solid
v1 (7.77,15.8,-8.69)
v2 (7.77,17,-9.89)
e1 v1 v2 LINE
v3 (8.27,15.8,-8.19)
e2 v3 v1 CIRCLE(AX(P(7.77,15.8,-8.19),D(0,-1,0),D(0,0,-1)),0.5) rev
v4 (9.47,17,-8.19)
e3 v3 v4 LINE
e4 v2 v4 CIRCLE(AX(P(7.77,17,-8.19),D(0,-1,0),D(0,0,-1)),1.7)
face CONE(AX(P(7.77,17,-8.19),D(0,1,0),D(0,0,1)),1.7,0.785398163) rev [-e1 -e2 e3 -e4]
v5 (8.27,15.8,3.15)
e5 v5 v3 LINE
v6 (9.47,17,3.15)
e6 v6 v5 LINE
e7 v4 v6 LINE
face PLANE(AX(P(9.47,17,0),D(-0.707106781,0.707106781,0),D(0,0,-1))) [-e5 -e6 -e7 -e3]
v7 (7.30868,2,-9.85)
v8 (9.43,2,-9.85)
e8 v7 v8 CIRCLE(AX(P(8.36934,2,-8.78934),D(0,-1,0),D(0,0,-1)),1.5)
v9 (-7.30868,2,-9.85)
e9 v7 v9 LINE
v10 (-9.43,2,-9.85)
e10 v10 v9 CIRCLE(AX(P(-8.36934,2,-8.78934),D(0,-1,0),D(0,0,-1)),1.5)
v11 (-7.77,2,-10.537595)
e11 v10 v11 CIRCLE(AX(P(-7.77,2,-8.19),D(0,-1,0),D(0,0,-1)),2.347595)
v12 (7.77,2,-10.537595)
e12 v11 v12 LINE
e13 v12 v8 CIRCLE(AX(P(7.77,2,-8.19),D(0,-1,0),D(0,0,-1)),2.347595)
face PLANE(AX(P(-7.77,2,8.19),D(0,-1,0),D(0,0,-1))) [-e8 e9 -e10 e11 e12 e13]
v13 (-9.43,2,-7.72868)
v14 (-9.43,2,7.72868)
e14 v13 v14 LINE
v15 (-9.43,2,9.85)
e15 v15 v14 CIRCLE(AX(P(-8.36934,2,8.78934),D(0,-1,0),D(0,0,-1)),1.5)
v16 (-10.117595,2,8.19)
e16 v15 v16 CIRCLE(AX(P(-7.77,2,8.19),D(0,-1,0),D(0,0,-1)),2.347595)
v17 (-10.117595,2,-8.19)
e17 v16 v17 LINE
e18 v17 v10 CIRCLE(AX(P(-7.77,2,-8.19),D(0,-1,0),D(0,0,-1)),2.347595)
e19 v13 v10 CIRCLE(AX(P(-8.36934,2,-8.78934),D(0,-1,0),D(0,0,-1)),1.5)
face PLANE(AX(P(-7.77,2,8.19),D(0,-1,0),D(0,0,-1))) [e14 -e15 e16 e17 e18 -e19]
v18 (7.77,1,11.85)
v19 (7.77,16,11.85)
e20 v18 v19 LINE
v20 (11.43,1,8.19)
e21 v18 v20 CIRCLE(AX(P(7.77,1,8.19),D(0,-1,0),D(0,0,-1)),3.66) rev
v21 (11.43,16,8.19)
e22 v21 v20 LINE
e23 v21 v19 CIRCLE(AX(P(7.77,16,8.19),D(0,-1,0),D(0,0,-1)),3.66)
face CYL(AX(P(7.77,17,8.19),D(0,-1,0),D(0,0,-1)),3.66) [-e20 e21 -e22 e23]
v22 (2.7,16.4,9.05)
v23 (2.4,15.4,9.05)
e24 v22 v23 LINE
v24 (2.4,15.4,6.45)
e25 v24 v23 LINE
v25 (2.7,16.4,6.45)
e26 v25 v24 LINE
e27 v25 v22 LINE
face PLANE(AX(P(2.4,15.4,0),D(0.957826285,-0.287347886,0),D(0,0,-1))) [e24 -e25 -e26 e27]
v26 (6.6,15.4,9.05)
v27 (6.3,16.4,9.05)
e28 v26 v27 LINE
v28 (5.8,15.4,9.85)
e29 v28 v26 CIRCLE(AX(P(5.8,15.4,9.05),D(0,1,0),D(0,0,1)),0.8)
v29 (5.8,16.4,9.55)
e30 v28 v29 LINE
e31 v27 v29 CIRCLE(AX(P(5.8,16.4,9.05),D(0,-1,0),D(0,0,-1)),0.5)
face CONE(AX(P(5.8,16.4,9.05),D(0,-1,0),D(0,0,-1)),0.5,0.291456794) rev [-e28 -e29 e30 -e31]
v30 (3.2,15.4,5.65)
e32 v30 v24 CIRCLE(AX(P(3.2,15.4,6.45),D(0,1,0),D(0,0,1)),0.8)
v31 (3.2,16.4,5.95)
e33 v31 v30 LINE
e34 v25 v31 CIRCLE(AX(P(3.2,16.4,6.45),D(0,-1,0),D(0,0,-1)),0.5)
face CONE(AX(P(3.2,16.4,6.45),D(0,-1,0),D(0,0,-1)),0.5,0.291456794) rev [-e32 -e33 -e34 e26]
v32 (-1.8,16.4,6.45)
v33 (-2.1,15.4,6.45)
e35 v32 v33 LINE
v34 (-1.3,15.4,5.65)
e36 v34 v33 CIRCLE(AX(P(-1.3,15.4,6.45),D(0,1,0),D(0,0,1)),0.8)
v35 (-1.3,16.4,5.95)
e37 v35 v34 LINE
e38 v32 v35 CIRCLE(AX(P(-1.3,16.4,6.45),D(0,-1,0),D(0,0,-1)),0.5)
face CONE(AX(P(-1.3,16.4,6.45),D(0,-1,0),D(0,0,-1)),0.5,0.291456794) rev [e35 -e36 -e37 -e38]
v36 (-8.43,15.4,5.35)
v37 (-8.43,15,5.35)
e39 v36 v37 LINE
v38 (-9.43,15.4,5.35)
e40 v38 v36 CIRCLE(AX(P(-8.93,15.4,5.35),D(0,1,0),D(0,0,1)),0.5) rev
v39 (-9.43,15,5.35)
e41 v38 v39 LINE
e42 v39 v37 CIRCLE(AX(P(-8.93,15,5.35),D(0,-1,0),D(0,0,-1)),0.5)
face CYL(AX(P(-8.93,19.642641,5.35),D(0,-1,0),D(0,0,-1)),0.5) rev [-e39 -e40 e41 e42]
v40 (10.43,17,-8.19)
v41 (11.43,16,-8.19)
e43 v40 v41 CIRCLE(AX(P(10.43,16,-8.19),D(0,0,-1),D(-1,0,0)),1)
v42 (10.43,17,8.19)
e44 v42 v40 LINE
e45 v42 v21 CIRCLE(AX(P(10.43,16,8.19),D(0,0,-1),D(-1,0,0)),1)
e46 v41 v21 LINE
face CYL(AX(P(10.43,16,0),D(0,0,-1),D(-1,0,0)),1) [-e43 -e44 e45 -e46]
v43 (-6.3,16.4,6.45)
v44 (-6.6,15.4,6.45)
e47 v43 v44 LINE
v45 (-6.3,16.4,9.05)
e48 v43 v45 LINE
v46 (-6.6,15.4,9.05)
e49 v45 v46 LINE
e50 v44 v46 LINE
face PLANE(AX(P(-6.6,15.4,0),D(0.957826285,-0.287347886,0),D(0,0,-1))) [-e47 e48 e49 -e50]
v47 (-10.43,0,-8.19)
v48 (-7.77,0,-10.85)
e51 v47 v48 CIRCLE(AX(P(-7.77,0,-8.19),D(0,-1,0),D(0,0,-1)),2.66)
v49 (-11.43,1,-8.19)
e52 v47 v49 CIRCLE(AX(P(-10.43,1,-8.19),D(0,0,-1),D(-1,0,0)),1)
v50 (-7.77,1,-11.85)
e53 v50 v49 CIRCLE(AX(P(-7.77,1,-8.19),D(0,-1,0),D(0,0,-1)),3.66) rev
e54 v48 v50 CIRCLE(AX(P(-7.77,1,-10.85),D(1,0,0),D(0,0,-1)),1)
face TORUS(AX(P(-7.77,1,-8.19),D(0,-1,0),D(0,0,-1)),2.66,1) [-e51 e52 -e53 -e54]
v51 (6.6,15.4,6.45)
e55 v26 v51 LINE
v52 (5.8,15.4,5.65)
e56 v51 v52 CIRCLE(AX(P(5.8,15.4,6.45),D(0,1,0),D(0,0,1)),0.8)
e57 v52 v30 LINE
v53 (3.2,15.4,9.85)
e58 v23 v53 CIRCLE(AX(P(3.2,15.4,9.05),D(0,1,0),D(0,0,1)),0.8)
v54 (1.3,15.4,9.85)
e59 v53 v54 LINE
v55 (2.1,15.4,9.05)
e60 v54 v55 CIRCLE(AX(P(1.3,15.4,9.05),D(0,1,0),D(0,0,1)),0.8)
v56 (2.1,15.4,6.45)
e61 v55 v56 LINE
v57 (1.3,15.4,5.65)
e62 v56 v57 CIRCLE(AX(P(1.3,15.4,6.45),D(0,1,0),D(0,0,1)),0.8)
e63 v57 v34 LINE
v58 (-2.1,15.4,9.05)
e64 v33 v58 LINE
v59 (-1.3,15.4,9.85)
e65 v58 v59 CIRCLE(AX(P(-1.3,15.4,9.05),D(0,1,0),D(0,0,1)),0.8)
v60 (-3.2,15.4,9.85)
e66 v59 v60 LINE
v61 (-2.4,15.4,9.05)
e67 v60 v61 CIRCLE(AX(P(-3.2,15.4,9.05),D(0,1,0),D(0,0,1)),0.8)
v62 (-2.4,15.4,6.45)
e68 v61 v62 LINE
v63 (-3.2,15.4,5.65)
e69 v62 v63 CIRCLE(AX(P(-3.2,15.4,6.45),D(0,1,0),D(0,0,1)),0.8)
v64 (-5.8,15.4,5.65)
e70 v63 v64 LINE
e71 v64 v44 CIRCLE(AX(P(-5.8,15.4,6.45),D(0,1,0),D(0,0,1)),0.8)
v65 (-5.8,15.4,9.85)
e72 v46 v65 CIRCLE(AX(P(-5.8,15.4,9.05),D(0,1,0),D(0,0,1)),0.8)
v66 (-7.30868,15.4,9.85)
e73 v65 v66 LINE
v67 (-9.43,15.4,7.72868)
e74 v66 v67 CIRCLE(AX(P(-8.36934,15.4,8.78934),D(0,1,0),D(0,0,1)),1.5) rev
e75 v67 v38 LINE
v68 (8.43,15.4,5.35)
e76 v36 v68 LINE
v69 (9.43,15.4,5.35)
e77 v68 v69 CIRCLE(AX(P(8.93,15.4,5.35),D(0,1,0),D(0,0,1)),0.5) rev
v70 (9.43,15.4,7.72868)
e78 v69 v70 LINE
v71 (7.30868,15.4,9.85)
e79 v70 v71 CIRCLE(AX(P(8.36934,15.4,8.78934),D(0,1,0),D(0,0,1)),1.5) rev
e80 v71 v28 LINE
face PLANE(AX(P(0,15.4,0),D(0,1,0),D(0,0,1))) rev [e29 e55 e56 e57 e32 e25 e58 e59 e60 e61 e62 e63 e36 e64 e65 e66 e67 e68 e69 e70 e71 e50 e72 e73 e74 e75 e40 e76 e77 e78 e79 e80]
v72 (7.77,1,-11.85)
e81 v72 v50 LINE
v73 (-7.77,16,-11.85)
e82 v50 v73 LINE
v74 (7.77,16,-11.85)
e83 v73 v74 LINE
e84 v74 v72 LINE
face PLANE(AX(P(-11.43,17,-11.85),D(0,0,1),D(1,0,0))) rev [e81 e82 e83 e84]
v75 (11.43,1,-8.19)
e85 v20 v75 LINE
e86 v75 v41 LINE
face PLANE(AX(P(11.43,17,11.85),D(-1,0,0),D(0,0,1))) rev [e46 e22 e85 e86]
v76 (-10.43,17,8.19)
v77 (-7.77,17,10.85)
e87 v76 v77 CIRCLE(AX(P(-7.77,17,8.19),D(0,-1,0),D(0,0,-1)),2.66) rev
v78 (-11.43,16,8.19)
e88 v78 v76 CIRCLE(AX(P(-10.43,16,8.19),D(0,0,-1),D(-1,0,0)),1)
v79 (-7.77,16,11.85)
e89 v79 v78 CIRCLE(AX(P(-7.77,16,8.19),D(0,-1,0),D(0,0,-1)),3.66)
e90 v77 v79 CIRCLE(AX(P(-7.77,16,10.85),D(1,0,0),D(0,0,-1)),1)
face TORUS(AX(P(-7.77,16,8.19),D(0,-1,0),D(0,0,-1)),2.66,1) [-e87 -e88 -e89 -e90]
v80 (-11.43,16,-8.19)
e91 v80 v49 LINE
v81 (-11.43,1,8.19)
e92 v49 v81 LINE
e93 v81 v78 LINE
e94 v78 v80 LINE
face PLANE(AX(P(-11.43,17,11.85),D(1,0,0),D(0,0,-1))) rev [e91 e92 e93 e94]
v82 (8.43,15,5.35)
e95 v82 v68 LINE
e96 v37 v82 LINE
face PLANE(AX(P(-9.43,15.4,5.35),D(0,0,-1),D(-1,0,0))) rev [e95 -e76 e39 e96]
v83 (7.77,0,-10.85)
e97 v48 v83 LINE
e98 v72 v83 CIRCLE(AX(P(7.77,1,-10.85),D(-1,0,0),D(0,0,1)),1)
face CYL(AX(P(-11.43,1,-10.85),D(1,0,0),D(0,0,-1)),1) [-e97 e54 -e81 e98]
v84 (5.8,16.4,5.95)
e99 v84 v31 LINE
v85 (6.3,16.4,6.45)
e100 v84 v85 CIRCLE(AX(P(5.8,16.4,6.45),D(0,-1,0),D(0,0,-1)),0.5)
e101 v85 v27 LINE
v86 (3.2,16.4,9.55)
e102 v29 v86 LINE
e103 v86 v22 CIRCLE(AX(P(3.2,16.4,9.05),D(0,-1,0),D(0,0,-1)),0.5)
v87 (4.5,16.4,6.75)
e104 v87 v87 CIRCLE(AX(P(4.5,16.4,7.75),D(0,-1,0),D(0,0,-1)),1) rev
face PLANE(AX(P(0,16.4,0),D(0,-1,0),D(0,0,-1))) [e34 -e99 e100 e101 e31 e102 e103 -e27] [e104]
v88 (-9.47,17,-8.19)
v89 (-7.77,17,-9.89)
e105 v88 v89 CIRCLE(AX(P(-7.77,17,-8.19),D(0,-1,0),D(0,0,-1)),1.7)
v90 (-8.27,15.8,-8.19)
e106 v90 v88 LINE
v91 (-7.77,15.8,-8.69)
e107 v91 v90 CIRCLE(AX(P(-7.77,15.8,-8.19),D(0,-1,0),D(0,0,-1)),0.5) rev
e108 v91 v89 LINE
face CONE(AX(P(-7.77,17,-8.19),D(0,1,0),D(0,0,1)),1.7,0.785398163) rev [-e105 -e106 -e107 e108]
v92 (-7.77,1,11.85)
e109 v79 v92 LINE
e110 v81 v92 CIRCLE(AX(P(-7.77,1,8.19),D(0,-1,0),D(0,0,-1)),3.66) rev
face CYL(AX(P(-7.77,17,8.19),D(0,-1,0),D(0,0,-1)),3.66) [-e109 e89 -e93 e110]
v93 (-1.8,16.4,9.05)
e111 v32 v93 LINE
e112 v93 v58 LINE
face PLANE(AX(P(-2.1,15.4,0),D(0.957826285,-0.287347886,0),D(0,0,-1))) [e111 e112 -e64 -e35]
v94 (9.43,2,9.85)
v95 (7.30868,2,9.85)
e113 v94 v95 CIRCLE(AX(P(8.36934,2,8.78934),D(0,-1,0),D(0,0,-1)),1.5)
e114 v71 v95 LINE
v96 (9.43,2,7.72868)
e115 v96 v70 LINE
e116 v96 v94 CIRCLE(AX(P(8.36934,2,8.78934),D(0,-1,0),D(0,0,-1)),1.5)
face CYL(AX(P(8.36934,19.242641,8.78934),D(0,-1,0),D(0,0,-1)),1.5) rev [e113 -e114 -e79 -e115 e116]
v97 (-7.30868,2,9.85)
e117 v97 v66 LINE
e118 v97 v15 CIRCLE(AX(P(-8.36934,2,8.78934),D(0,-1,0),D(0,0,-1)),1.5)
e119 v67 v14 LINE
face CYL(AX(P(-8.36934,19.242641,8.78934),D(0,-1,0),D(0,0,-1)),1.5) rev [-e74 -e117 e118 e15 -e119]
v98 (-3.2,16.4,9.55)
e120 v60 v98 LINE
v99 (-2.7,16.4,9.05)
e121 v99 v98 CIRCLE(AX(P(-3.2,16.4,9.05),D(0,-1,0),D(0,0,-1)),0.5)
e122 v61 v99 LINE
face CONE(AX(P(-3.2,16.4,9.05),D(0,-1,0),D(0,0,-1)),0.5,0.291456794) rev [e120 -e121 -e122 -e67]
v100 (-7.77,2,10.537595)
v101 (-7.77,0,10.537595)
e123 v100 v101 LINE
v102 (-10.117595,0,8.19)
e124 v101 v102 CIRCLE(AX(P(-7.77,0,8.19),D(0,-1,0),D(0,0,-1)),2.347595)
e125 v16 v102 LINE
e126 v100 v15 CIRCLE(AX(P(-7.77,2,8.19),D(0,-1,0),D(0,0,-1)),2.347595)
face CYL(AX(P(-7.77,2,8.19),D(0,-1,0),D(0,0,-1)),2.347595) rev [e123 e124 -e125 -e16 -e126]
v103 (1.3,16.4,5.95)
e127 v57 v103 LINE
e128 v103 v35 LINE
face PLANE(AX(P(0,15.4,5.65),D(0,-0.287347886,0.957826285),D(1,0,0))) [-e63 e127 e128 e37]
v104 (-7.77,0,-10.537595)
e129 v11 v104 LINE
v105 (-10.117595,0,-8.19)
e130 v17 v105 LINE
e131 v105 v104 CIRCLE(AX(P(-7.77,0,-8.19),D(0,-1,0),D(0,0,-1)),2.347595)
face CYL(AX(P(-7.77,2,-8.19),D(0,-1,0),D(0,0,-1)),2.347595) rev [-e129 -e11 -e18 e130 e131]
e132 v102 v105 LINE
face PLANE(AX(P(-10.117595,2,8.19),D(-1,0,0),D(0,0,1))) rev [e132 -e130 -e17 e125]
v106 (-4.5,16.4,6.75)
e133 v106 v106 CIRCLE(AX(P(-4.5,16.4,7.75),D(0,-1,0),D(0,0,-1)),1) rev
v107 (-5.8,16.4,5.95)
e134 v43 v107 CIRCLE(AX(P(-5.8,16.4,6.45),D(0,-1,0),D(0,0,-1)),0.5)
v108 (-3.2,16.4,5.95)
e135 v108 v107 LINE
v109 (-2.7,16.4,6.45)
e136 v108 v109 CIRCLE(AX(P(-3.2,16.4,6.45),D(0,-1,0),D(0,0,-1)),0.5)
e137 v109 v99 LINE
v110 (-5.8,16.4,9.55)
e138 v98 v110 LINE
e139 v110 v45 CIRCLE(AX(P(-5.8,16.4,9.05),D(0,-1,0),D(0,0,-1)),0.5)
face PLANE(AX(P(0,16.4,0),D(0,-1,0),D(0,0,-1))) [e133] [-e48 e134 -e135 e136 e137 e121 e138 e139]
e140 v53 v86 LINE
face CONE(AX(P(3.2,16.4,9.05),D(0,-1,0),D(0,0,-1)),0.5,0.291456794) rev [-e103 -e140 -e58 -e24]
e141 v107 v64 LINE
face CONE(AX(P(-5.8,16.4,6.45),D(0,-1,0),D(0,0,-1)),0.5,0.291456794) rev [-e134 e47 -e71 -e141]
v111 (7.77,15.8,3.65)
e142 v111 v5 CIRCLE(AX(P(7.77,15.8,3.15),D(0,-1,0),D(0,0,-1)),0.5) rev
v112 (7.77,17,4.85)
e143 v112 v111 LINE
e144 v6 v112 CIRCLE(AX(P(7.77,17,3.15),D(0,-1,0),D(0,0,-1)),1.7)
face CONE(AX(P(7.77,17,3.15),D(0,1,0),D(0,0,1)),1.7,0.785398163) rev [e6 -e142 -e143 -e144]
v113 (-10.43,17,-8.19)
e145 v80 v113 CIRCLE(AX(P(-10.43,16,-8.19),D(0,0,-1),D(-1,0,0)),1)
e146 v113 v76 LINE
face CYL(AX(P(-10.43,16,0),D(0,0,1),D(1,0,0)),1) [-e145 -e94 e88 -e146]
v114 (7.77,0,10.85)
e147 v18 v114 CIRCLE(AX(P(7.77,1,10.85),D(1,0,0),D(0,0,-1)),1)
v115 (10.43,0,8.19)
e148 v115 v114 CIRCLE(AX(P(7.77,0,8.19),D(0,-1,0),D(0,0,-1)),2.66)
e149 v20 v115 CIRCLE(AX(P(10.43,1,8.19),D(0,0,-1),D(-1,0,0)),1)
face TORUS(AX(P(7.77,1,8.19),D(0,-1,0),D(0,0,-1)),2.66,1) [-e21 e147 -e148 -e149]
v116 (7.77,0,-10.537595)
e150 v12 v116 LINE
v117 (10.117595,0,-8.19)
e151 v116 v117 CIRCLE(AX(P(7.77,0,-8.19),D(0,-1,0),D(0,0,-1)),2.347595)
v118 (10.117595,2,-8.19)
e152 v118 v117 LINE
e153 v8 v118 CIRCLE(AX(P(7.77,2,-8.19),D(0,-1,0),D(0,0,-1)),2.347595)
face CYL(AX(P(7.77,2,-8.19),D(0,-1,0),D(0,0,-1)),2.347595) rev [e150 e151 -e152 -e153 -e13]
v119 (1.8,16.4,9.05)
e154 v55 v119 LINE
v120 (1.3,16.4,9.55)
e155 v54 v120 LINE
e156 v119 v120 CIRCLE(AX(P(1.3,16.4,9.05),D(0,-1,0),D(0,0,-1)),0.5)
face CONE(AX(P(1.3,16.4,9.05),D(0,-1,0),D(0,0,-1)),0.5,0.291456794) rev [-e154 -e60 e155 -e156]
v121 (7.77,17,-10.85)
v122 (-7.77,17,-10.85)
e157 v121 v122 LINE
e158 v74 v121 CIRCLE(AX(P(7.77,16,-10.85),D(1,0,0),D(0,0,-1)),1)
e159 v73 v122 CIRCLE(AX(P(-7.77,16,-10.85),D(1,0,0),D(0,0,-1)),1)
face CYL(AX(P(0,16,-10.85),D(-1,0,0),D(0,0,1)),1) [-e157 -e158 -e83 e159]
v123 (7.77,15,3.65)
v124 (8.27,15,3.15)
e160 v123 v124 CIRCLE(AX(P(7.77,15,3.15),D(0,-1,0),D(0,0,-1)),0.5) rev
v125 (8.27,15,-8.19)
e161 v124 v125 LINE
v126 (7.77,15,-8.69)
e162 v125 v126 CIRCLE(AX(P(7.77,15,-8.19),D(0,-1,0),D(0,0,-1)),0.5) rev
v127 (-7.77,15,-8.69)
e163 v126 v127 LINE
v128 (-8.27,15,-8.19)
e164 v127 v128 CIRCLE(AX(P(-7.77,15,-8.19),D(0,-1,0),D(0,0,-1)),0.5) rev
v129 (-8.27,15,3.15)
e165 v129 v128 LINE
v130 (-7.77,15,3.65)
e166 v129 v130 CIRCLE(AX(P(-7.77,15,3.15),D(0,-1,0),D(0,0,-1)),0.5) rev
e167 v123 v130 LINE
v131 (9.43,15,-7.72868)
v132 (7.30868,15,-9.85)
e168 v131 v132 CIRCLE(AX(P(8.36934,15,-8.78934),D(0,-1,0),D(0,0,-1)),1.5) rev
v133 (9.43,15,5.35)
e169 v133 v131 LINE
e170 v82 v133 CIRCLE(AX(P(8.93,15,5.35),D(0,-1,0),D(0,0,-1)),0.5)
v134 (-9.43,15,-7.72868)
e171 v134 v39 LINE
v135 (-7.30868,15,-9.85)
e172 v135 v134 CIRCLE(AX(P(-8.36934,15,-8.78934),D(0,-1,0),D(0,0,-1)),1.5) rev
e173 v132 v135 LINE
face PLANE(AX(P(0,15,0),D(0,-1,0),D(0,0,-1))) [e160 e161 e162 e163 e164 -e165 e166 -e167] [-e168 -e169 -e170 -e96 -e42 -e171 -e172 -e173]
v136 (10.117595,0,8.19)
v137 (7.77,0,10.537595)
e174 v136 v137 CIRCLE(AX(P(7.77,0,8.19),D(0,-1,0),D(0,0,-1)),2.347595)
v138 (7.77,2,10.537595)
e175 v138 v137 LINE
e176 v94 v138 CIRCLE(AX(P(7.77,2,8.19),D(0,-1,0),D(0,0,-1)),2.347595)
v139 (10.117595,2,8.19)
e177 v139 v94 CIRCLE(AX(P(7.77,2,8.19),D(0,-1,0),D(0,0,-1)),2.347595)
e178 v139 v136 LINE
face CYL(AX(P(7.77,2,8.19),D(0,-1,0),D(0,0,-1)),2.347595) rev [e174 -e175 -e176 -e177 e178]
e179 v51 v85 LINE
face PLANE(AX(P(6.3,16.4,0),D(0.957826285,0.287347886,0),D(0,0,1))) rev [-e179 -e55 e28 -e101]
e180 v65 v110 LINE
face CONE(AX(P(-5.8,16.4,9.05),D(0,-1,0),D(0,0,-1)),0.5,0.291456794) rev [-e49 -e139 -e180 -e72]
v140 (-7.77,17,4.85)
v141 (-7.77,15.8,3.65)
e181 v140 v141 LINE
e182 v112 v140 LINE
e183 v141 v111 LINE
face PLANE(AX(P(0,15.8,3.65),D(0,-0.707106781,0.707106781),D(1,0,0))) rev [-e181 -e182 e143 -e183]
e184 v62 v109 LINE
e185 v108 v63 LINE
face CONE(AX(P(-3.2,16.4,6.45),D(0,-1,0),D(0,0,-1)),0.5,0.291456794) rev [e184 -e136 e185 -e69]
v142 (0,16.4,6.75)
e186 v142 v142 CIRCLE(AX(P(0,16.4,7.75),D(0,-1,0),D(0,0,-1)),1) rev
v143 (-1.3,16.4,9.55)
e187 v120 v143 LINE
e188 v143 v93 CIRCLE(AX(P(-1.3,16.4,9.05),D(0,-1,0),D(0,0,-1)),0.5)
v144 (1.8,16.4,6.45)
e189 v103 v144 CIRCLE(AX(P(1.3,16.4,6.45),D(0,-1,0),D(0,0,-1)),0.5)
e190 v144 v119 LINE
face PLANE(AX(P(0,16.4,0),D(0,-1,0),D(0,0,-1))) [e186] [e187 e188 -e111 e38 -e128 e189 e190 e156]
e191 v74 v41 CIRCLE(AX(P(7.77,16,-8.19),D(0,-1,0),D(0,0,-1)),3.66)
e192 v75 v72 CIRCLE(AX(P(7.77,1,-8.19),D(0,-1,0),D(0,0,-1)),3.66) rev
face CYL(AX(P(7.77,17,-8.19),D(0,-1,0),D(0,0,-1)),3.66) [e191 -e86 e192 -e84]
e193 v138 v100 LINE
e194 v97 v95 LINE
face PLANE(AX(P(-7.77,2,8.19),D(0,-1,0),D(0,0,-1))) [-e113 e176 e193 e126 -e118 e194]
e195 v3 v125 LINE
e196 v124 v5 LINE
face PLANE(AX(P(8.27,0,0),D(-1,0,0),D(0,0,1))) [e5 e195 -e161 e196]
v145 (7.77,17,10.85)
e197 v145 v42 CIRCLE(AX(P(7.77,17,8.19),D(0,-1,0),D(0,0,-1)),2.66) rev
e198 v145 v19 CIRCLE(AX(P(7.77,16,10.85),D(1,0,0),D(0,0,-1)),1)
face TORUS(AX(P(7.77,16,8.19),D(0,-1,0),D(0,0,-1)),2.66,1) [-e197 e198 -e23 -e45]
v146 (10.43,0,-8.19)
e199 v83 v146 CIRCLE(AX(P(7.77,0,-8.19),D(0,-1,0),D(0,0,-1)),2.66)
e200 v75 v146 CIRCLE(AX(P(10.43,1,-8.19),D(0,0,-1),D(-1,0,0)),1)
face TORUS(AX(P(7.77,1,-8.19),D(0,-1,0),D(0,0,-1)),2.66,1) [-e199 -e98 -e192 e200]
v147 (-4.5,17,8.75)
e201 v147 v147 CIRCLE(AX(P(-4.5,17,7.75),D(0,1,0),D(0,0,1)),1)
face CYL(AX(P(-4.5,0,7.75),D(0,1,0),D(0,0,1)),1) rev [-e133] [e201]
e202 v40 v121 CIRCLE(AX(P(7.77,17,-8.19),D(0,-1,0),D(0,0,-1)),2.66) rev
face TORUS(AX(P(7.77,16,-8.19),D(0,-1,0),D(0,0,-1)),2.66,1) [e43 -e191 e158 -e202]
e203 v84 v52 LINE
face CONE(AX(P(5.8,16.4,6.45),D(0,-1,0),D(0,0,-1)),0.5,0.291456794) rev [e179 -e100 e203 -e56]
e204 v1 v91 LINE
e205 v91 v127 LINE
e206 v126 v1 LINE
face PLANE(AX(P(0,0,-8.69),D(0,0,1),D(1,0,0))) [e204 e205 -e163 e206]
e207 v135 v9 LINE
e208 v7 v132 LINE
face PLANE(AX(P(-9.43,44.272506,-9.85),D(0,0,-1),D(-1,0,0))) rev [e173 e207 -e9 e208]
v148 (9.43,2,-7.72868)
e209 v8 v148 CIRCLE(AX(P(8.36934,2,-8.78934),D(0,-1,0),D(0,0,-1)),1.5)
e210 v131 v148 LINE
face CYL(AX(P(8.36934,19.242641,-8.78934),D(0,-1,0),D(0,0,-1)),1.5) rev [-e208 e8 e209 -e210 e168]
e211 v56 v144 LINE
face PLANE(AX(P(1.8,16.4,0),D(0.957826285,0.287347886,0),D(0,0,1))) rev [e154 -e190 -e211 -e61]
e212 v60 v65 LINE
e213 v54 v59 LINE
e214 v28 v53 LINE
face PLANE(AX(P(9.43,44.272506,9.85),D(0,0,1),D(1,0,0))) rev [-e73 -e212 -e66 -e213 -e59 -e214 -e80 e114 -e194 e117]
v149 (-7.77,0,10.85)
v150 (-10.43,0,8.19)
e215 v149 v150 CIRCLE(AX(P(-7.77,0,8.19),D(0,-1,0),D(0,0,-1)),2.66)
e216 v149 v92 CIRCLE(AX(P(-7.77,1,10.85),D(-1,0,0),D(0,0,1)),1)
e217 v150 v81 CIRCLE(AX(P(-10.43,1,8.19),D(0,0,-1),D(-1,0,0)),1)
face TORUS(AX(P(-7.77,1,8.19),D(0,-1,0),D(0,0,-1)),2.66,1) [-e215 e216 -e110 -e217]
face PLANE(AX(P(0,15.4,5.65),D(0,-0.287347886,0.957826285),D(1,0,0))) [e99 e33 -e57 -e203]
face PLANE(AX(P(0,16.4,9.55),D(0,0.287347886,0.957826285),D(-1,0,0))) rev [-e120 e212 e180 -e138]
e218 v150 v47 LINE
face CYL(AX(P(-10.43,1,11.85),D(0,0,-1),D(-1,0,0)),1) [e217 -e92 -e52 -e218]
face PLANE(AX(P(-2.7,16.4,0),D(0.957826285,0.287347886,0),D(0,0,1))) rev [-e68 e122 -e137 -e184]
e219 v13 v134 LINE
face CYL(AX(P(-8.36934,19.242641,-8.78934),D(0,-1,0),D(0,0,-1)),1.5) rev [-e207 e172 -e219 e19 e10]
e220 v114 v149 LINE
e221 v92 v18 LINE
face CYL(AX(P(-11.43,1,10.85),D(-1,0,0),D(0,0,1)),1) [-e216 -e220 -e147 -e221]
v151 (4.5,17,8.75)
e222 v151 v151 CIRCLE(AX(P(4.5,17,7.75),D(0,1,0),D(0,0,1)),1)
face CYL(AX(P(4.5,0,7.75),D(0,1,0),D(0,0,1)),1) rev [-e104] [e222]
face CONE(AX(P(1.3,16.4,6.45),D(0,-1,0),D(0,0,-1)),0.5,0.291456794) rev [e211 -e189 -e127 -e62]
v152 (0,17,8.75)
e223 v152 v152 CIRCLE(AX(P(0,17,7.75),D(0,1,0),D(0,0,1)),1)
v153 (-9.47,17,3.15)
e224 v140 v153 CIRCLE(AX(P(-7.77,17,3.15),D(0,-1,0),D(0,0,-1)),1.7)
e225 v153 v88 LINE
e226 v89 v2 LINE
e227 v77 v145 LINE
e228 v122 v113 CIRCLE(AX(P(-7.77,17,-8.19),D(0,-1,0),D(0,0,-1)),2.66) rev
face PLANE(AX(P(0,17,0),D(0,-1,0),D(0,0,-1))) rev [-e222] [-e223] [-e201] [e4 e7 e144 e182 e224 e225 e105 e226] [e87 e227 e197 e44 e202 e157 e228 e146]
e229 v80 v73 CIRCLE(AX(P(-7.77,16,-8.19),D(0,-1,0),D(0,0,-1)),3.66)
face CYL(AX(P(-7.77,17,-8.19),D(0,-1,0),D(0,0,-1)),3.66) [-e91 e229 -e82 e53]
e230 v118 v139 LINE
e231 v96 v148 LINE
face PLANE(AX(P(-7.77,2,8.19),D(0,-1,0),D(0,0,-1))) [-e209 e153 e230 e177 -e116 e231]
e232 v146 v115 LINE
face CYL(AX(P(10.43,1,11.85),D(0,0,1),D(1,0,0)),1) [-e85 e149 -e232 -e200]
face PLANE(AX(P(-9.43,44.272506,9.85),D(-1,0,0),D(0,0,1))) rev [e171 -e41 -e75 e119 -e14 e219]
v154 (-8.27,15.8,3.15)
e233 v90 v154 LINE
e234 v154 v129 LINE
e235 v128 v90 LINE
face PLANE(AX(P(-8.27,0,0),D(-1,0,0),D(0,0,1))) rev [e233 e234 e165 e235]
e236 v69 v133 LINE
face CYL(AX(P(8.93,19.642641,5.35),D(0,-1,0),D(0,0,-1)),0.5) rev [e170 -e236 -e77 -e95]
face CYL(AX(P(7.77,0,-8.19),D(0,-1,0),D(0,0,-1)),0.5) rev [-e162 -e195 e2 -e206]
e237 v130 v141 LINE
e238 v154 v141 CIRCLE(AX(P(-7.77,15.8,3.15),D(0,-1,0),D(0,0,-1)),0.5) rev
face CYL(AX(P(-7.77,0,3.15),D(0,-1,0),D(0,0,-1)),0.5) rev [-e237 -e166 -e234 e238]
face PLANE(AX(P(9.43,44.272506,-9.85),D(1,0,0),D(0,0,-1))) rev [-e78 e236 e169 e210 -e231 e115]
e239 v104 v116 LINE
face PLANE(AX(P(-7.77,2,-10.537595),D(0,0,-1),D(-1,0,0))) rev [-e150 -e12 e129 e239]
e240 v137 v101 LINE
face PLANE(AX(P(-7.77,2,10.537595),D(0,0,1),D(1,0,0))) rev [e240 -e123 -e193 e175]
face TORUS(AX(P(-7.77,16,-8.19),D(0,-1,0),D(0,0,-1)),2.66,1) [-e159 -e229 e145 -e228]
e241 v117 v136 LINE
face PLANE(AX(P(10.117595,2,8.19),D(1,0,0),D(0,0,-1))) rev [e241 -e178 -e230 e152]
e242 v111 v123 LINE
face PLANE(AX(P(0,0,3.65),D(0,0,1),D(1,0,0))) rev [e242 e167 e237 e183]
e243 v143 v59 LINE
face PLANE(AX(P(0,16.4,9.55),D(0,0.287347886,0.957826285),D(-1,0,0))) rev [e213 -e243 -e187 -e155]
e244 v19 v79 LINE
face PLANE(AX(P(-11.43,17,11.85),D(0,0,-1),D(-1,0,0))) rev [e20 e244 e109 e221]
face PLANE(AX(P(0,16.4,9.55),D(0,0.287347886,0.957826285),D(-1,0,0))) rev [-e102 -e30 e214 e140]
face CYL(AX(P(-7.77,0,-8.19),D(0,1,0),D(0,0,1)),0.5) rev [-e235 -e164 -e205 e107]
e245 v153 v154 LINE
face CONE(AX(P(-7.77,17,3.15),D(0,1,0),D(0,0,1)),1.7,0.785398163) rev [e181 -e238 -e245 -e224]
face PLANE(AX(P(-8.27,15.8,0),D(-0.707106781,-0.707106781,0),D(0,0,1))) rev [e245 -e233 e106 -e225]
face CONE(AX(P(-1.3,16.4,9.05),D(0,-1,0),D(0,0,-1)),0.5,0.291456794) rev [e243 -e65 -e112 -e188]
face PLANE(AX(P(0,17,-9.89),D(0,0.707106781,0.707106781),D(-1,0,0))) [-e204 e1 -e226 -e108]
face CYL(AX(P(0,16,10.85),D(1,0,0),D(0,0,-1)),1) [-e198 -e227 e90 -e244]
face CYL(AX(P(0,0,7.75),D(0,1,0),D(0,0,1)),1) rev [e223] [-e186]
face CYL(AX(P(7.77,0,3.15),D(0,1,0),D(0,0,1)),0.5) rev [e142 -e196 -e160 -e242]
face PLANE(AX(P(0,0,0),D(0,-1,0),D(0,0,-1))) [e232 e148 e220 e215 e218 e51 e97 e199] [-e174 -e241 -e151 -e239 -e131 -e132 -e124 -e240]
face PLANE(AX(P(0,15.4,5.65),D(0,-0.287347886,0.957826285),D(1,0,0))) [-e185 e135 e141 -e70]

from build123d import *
from OCP.BRepFilletAPI import BRepFilletAPI_MakeChamfer

# Parameters (mm, degrees)
SKETCH_1_W            = 22.86
SKETCH_1_H            = 23.7
EXTRUDE_1_DEPTH       = 17
SKETCH_2_W            = 18.86
SKETCH_2_H            = 19.7
CUT_EXTRUDE_1_DEPTH   = 15
FILLET_1_R            = 3.66
SKETCH_3_R            = 1
CUT_EXTRUDE_2_DEPTH   = 24.665743174
SKETCH_4_W            = 16.54
SKETCH_4_H            = 12.34
CUT_EXTRUDE_3_DEPTH   = 24.665743174
FILLET_2_R            = 0.5
CHAMFER_1_SIZE        = 1.2
FILLET_3_R            = 1
CUT_EXTRUDE_4_DEPTH   = 2
SKETCH_6_R            = 1.5
CUT_EXTRUDE_5_R_DEPTH = 13
SKETCH_8_W            = 18.86
SKETCH_8_H            = 4.5
CUT_EXTRUDE_5_DEPTH   = 0.4
CUT_EXTRUDE_START     = -1
SKETCH_11_R           = 1
CUT_EXTRUDE_6_DEPTH   = 1
SKETCH_12_R           = 1.5
SKETCH_12_R_2         = 0.5
CUT_EXTRUDE_7_DEPTH   = 0.4
CHAMFER_2_SIZE        = 0.3
CHAMFER_2_SIZE_2      = 1


with BuildPart() as part:
    # 草图1 → 凸台-拉伸1 (new body)
    with BuildSketch(Plane(origin=(0, 0, 0), x_dir=(1, 0, 0), z_dir=(0, 1, 0))):
        Rectangle(SKETCH_1_W, SKETCH_1_H)
    extrude(amount=EXTRUDE_1_DEPTH)

    # 草图2 → 切除-拉伸1 (cut)
    with BuildSketch(Plane.XZ):
        Rectangle(SKETCH_2_W, SKETCH_2_H)
    extrude(amount=-CUT_EXTRUDE_1_DEPTH, mode=Mode.SUBTRACT)

    # 圆角1
    fillet_1_edges = [part.edges().sort_by_distance(p)[0] for p in [
        (11.43, 8.5, 11.85),
        (-11.43, 8.5, 11.85),
        (-11.43, 8.5, -11.85),
        (11.43, 8.5, -11.85),
    ]]
    fillet(fillet_1_edges, radius=FILLET_1_R)

    # 草图3 → 切除-拉伸2 (cut, through all)
    with BuildSketch(Plane(origin=(0, 17, 0), x_dir=(1, 0, 0), z_dir=(0, 1, 0))):
        with Locations(Location((0, -7.75, 0), (0, 0, 270))):
            Circle(SKETCH_3_R)
        with Locations(Location((4.5, -7.75, 0), (0, 0, 270))):
            Circle(SKETCH_3_R)
        with Locations(Location((-4.5, -7.75, 0), (0, 0, 270))):
            Circle(SKETCH_3_R)
    extrude(amount=-CUT_EXTRUDE_2_DEPTH, mode=Mode.SUBTRACT)

    # 草图4 → 切除-拉伸3 (cut, through all)
    with BuildSketch(Plane(origin=(0, 17, 0), x_dir=(1, 0, 0), z_dir=(0, 1, 0))):
        with Locations((0, 2.52)):
            Rectangle(SKETCH_4_W, SKETCH_4_H)
    extrude(amount=-CUT_EXTRUDE_3_DEPTH, mode=Mode.SUBTRACT)

    # 圆角2
    fillet_2_edges = [part.edges().sort_by_distance(p)[0] for p in [
        (-8.27, 16, -8.69),
        (8.27, 16, -8.69),
        (8.27, 16, 3.65),
        (-8.27, 16, 3.65),
    ]]
    fillet(fillet_2_edges, radius=FILLET_2_R)

    # 倒角1
    chamfer_1_edges = [part.edges().sort_by_distance(p)[0] for p in [
        (8.27, 17, -2.52),
        (0, 17, 3.65),
        (-8.27, 17, -2.52),
        (0, 17, -8.69),
        (8.123553391, 17, 3.503553391),
        (-8.123553391, 17, 3.503553391),
        (-8.123553391, 17, -8.543553391),
        (8.123553391, 17, -8.543553391),
    ]]
    chamfer(chamfer_1_edges, length=CHAMFER_1_SIZE)

    # 圆角3
    fillet_3_edges = [part.edges().sort_by_distance(p)[0] for p in [
        (0, 0, -11.85),
        (0, 17, -11.85),
        (11.43, 0, 0),
        (0, 0, 11.85),
        (-11.43, 0, 0),
        (-10.358010819, 0, 10.778010819),
        (10.358010819, 0, 10.778010819),
        (-10.358010819, 0, -10.778010819),
        (10.358010819, 0, -10.778010819),
        (11.43, 17, 0),
        (-11.43, 17, 0),
        (0, 17, 11.85),
        (-10.358010819, 17, 10.778010819),
        (10.358010819, 17, 10.778010819),
        (-10.358010819, 17, -10.778010819),
        (10.358010819, 17, -10.778010819),
    ]]
    fillet(fillet_3_edges, radius=FILLET_3_R)

    # 草图5 → 切除-拉伸4 (cut)
    with BuildSketch(Plane.XZ):
        with BuildLine():
            Line((-7.77, 10.537594514), (7.77, 10.537594514))
            ThreePointArc((7.77, 10.537594514), (9.43, 9.85), (10.117594514, 8.19))
            Line((10.117594514, 8.19), (10.117594514, -8.19))
            ThreePointArc((10.117594514, -8.19), (9.43, -9.85), (7.77, -10.537594514))
            Line((7.77, -10.537594514), (-7.77, -10.537594514))
            ThreePointArc((-7.77, -10.537594514), (-9.43, -9.85), (-10.117594514, -8.19))
            Line((-10.117594514, -8.19), (-10.117594514, 8.19))
            ThreePointArc((-10.117594514, 8.19), (-9.43, 9.85), (-7.77, 10.537594514))
        make_face()
    extrude(amount=-CUT_EXTRUDE_4_DEPTH, mode=Mode.SUBTRACT)

    # 草图6 → 切除-拉伸5_可根据铣刀经济半径修改R角 (cut)
    with BuildSketch(Plane.XZ.offset(-2)):
        with Locations((8.369339828, 8.789339828)):
            Circle(SKETCH_6_R)
        with Locations((8.369339828, -8.789339828)):
            Circle(SKETCH_6_R)
        with Locations((-8.369339828, -8.789339828)):
            Circle(SKETCH_6_R)
        with Locations((-8.369339828, 8.789339828)):
            Circle(SKETCH_6_R)
    extrude(amount=-CUT_EXTRUDE_5_R_DEPTH, mode=Mode.SUBTRACT)

    # 草图8 → 切除-拉伸5 (cut)
    with BuildSketch(Plane.XZ.offset(-15)):
        with Locations((0, 7.6)):
            Rectangle(SKETCH_8_W, SKETCH_8_H)
    extrude(amount=-CUT_EXTRUDE_5_DEPTH, mode=Mode.SUBTRACT)

    # 草图11 → 切除-拉伸6 (cut)
    # profile 1 of 6: a face of its own
    with BuildSketch(Plane.XZ.offset(-15.4).offset(CUT_EXTRUDE_START)):
        with BuildLine():
            Line((2.7, 6.45), (2.7, 9.05))
            ThreePointArc((2.7, 9.05), (2.846446609, 9.403553391), (3.2, 9.55))
            Line((3.2, 9.55), (5.8, 9.55))
            ThreePointArc((5.8, 9.55), (6.153553391, 9.403553391), (6.3, 9.05))
            Line((6.3, 9.05), (6.3, 6.45))
            ThreePointArc((6.3, 6.45), (6.153553391, 6.096446609), (5.8, 5.95))
            Line((5.8, 5.95), (3.2, 5.95))
            ThreePointArc((3.2, 5.95), (2.846446609, 6.096446609), (2.7, 6.45))
        make_face()
        with BuildLine():
            ThreePointArc((3.2, 9.45), (2.917157288, 9.332842712), (2.8, 9.05))
            Line((2.8, 9.05), (2.8, 6.45))
            ThreePointArc((2.8, 6.45), (2.917157288, 6.167157288), (3.2, 6.05))
            Line((3.2, 6.05), (5.8, 6.05))
            ThreePointArc((5.8, 6.05), (6.082842712, 6.167157288), (6.2, 6.45))
            Line((6.2, 6.45), (6.2, 9.05))
            ThreePointArc((6.2, 9.05), (6.082842712, 9.332842712), (5.8, 9.45))
            Line((5.8, 9.45), (3.2, 9.45))
        make_face(mode=Mode.SUBTRACT)
    # profile 2 of 6: a face of its own
    with BuildSketch(Plane.XZ.offset(-15.4).offset(CUT_EXTRUDE_START)):
        with BuildLine():
            Line((5.8, 9.45), (3.2, 9.45))
            ThreePointArc((3.2, 9.45), (2.917157288, 9.332842712), (2.8, 9.05))
            Line((2.8, 9.05), (2.8, 6.45))
            ThreePointArc((2.8, 6.45), (2.917157288, 6.167157288), (3.2, 6.05))
            Line((3.2, 6.05), (5.8, 6.05))
            ThreePointArc((5.8, 6.05), (6.082842712, 6.167157288), (6.2, 6.45))
            Line((6.2, 6.45), (6.2, 9.05))
            ThreePointArc((6.2, 9.05), (6.082842712, 9.332842712), (5.8, 9.45))
        make_face()
        with Locations(Location((4.5, 7.75, 0), (0, 0, 90))):
            Circle(SKETCH_11_R, mode=Mode.SUBTRACT)
    # profile 3 of 6: a face of its own
    with BuildSketch(Plane.XZ.offset(-15.4).offset(CUT_EXTRUDE_START)):
        with BuildLine():
            Line((-1.8, 6.45), (-1.8, 9.05))
            ThreePointArc((-1.8, 9.05), (-1.653553391, 9.403553391), (-1.3, 9.55))
            Line((-1.3, 9.55), (1.3, 9.55))
            ThreePointArc((1.3, 9.55), (1.653553391, 9.403553391), (1.8, 9.05))
            Line((1.8, 9.05), (1.8, 6.45))
            ThreePointArc((1.8, 6.45), (1.653553391, 6.096446609), (1.3, 5.95))
            Line((1.3, 5.95), (-1.3, 5.95))
            ThreePointArc((-1.3, 5.95), (-1.653553391, 6.096446609), (-1.8, 6.45))
        make_face()
        with BuildLine():
            ThreePointArc((-1.3, 9.45), (-1.582842712, 9.332842712), (-1.7, 9.05))
            Line((-1.7, 9.05), (-1.7, 6.45))
            ThreePointArc((-1.7, 6.45), (-1.582842712, 6.167157288), (-1.3, 6.05))
            Line((-1.3, 6.05), (1.3, 6.05))
            ThreePointArc((1.3, 6.05), (1.582842712, 6.167157288), (1.7, 6.45))
            Line((1.7, 6.45), (1.7, 9.05))
            ThreePointArc((1.7, 9.05), (1.582842712, 9.332842712), (1.3, 9.45))
            Line((1.3, 9.45), (-1.3, 9.45))
        make_face(mode=Mode.SUBTRACT)
    # profile 4 of 6: a face of its own
    with BuildSketch(Plane.XZ.offset(-15.4).offset(CUT_EXTRUDE_START)):
        with BuildLine():
            Line((1.3, 9.45), (-1.3, 9.45))
            ThreePointArc((-1.3, 9.45), (-1.582842712, 9.332842712), (-1.7, 9.05))
            Line((-1.7, 9.05), (-1.7, 6.45))
            ThreePointArc((-1.7, 6.45), (-1.582842712, 6.167157288), (-1.3, 6.05))
            Line((-1.3, 6.05), (1.3, 6.05))
            ThreePointArc((1.3, 6.05), (1.582842712, 6.167157288), (1.7, 6.45))
            Line((1.7, 6.45), (1.7, 9.05))
            ThreePointArc((1.7, 9.05), (1.582842712, 9.332842712), (1.3, 9.45))
        make_face()
        with Locations(Location((0, 7.75, 0), (0, 0, 90))):
            Circle(SKETCH_11_R, mode=Mode.SUBTRACT)
    # profile 5 of 6: a face of its own
    with BuildSketch(Plane.XZ.offset(-15.4).offset(CUT_EXTRUDE_START)):
        with BuildLine():
            Line((-2.7, 6.45), (-2.7, 9.05))
            ThreePointArc((-2.7, 9.05), (-2.846446609, 9.403553391), (-3.2, 9.55))
            Line((-3.2, 9.55), (-5.8, 9.55))
            ThreePointArc((-5.8, 9.55), (-6.153553391, 9.403553391), (-6.3, 9.05))
            Line((-6.3, 9.05), (-6.3, 6.45))
            ThreePointArc((-6.3, 6.45), (-6.153553391, 6.096446609), (-5.8, 5.95))
            Line((-5.8, 5.95), (-3.2, 5.95))
            ThreePointArc((-3.2, 5.95), (-2.846446609, 6.096446609), (-2.7, 6.45))
        make_face()
        with BuildLine():
            ThreePointArc((-2.8, 9.05), (-2.917157288, 9.332842712), (-3.2, 9.45))
            Line((-3.2, 9.45), (-5.8, 9.45))
            ThreePointArc((-5.8, 9.45), (-6.082842712, 9.332842712), (-6.2, 9.05))
            Line((-6.2, 9.05), (-6.2, 6.45))
            ThreePointArc((-6.2, 6.45), (-6.082842712, 6.167157288), (-5.8, 6.05))
            Line((-5.8, 6.05), (-3.2, 6.05))
            ThreePointArc((-3.2, 6.05), (-2.917157288, 6.167157288), (-2.8, 6.45))
            Line((-2.8, 6.45), (-2.8, 9.05))
        make_face(mode=Mode.SUBTRACT)
    # profile 6 of 6: a face of its own
    with BuildSketch(Plane.XZ.offset(-15.4).offset(CUT_EXTRUDE_START)):
        with BuildLine():
            Line((-2.8, 6.45), (-2.8, 9.05))
            ThreePointArc((-2.8, 9.05), (-2.917157288, 9.332842712), (-3.2, 9.45))
            Line((-3.2, 9.45), (-5.8, 9.45))
            ThreePointArc((-5.8, 9.45), (-6.082842712, 9.332842712), (-6.2, 9.05))
            Line((-6.2, 9.05), (-6.2, 6.45))
            ThreePointArc((-6.2, 6.45), (-6.082842712, 6.167157288), (-5.8, 6.05))
            Line((-5.8, 6.05), (-3.2, 6.05))
            ThreePointArc((-3.2, 6.05), (-2.917157288, 6.167157288), (-2.8, 6.45))
        make_face()
        with Locations(Location((-4.5, 7.75, 0), (0, 0, 90))):
            Circle(SKETCH_11_R, mode=Mode.SUBTRACT)
    extrude(amount=CUT_EXTRUDE_6_DEPTH, mode=Mode.SUBTRACT)

    # 草图12 → 切除-拉伸7 (cut)
    with BuildSketch(Plane.XZ.offset(-15)):
        with Locations((8.369339828, 8.789339828)):
            Circle(SKETCH_12_R)
        with Locations((-8.369339828, 8.789339828)):
            Circle(SKETCH_12_R)
        with Locations((8.93, 5.35)):
            Circle(SKETCH_12_R_2)
        with Locations((-8.93, 5.35)):
            Circle(SKETCH_12_R_2)
    extrude(amount=-CUT_EXTRUDE_7_DEPTH, mode=Mode.SUBTRACT)

    # 倒角2
    chamfer_2_edges_1 = [part.edges().sort_by_distance(p)[0] for p in [
        (6.153553391, 15.4, 9.403553391),
    ]]
    chamfer_2_side_1 = [part.faces().sort_by_distance(p)[0] for p in [
        (6.157796031, 15.4, 9.407796031),
    ]]
    chamfer_2_edges_2 = [part.edges().sort_by_distance(p)[0] for p in [
        (4.5, 15.4, 9.55),
    ]]
    chamfer_2_side_2 = [part.faces().sort_by_distance(p)[0] for p in [
        (4.5, 15.4, 9.556),
    ]]
    chamfer_2_edges_3 = [part.edges().sort_by_distance(p)[0] for p in [
        (6.3, 15.4, 7.75),
    ]]
    chamfer_2_side_3 = [part.faces().sort_by_distance(p)[0] for p in [
        (6.306, 15.4, 7.75),
    ]]
    chamfer_2_edges_4 = [part.edges().sort_by_distance(p)[0] for p in [
        (2.846446609, 15.4, 9.403553391),
    ]]
    chamfer_2_side_4 = [part.faces().sort_by_distance(p)[0] for p in [
        (2.842203969, 15.4, 9.407796031),
    ]]
    chamfer_2_edges_5 = [part.edges().sort_by_distance(p)[0] for p in [
        (6.153553391, 15.4, 6.096446609),
    ]]
    chamfer_2_side_5 = [part.faces().sort_by_distance(p)[0] for p in [
        (6.157796031, 15.4, 6.092203969),
    ]]
    chamfer_2_edges_6 = [part.edges().sort_by_distance(p)[0] for p in [
        (2.7, 15.4, 7.75),
    ]]
    chamfer_2_side_6 = [part.faces().sort_by_distance(p)[0] for p in [
        (2.694, 15.4, 7.75),
    ]]
    chamfer_2_edges_7 = [part.edges().sort_by_distance(p)[0] for p in [
        (4.5, 15.4, 5.95),
    ]]
    chamfer_2_side_7 = [part.faces().sort_by_distance(p)[0] for p in [
        (4.5, 15.4, 5.944),
    ]]
    chamfer_2_edges_8 = [part.edges().sort_by_distance(p)[0] for p in [
        (2.846446609, 15.4, 6.096446609),
    ]]
    chamfer_2_side_8 = [part.faces().sort_by_distance(p)[0] for p in [
        (2.846446609, 15.406, 6.096446609),
    ]]
    chamfer_2_edges_9 = [part.edges().sort_by_distance(p)[0] for p in [
        (1.653553391, 15.4, 9.403553391),
    ]]
    chamfer_2_side_9 = [part.faces().sort_by_distance(p)[0] for p in [
        (1.657796031, 15.4, 9.407796031),
    ]]
    chamfer_2_edges_10 = [part.edges().sort_by_distance(p)[0] for p in [
        (0, 15.4, 9.55),
    ]]
    chamfer_2_side_10 = [part.faces().sort_by_distance(p)[0] for p in [
        (0, 15.4, 9.556),
    ]]
    chamfer_2_edges_11 = [part.edges().sort_by_distance(p)[0] for p in [
        (1.8, 15.4, 7.75),
    ]]
    chamfer_2_side_11 = [part.faces().sort_by_distance(p)[0] for p in [
        (1.806, 15.4, 7.75),
    ]]
    chamfer_2_edges_12 = [part.edges().sort_by_distance(p)[0] for p in [
        (-1.653553391, 15.4, 9.403553391),
    ]]
    chamfer_2_side_12 = [part.faces().sort_by_distance(p)[0] for p in [
        (-1.657796031, 15.4, 9.407796031),
    ]]
    chamfer_2_edges_13 = [part.edges().sort_by_distance(p)[0] for p in [
        (1.653553391, 15.4, 6.096446609),
    ]]
    chamfer_2_side_13 = [part.faces().sort_by_distance(p)[0] for p in [
        (1.657796031, 15.4, 6.092203969),
    ]]
    chamfer_2_edges_14 = [part.edges().sort_by_distance(p)[0] for p in [
        (-1.8, 15.4, 7.75),
    ]]
    chamfer_2_side_14 = [part.faces().sort_by_distance(p)[0] for p in [
        (-1.806, 15.4, 7.75),
    ]]
    chamfer_2_edges_15 = [part.edges().sort_by_distance(p)[0] for p in [
        (0, 15.4, 5.95),
    ]]
    chamfer_2_side_15 = [part.faces().sort_by_distance(p)[0] for p in [
        (0, 15.4, 5.944),
    ]]
    chamfer_2_edges_16 = [part.edges().sort_by_distance(p)[0] for p in [
        (-1.653553391, 15.4, 6.096446609),
    ]]
    chamfer_2_side_16 = [part.faces().sort_by_distance(p)[0] for p in [
        (-1.657796031, 15.4, 6.092203969),
    ]]
    chamfer_2_edges_17 = [part.edges().sort_by_distance(p)[0] for p in [
        (-2.7, 15.4, 7.75),
    ]]
    chamfer_2_side_17 = [part.faces().sort_by_distance(p)[0] for p in [
        (-2.694, 15.4, 7.75),
    ]]
    chamfer_2_edges_18 = [part.edges().sort_by_distance(p)[0] for p in [
        (-2.846446609, 15.4, 6.096446609),
    ]]
    chamfer_2_side_18 = [part.faces().sort_by_distance(p)[0] for p in [
        (-2.842203969, 15.4, 6.092203969),
    ]]
    chamfer_2_edges_19 = [part.edges().sort_by_distance(p)[0] for p in [
        (-2.846446609, 15.4, 9.403553391),
    ]]
    chamfer_2_side_19 = [part.faces().sort_by_distance(p)[0] for p in [
        (-2.842203969, 15.4, 9.407796031),
    ]]
    chamfer_2_edges_20 = [part.edges().sort_by_distance(p)[0] for p in [
        (-4.5, 15.4, 5.95),
    ]]
    chamfer_2_side_20 = [part.faces().sort_by_distance(p)[0] for p in [
        (-4.5, 15.4, 5.944),
    ]]
    chamfer_2_edges_21 = [part.edges().sort_by_distance(p)[0] for p in [
        (-4.5, 15.4, 9.55),
    ]]
    chamfer_2_side_21 = [part.faces().sort_by_distance(p)[0] for p in [
        (-4.5, 15.4, 9.556),
    ]]
    chamfer_2_edges_22 = [part.edges().sort_by_distance(p)[0] for p in [
        (-6.153553391, 15.4, 6.096446609),
    ]]
    chamfer_2_side_22 = [part.faces().sort_by_distance(p)[0] for p in [
        (-6.157796031, 15.4, 6.092203969),
    ]]
    chamfer_2_edges_23 = [part.edges().sort_by_distance(p)[0] for p in [
        (-6.153553391, 15.4, 9.403553391),
    ]]
    chamfer_2_side_23 = [part.faces().sort_by_distance(p)[0] for p in [
        (-6.157796031, 15.4, 9.407796031),
    ]]
    chamfer_2_edges_24 = [part.edges().sort_by_distance(p)[0] for p in [
        (-6.3, 15.4, 7.75),
    ]]
    chamfer_2_side_24 = [part.faces().sort_by_distance(p)[0] for p in [
        (-6.306, 15.4, 7.75),
    ]]
    chamfer_2 = BRepFilletAPI_MakeChamfer(part.part.solid().wrapped)
    for e in chamfer_2_edges_1:
        chamfer_2.Add(CHAMFER_2_SIZE - 0.0001, CHAMFER_2_SIZE_2 - 0.0001, e.wrapped, chamfer_2_side_1[0].wrapped)
    for e in chamfer_2_edges_2:
        chamfer_2.Add(CHAMFER_2_SIZE - 0.0001, CHAMFER_2_SIZE_2 - 0.0001, e.wrapped, chamfer_2_side_2[0].wrapped)
    for e in chamfer_2_edges_3:
        chamfer_2.Add(CHAMFER_2_SIZE - 0.0001, CHAMFER_2_SIZE_2 - 0.0001, e.wrapped, chamfer_2_side_3[0].wrapped)
    for e in chamfer_2_edges_4:
        chamfer_2.Add(CHAMFER_2_SIZE - 0.0001, CHAMFER_2_SIZE_2 - 0.0001, e.wrapped, chamfer_2_side_4[0].wrapped)
    for e in chamfer_2_edges_5:
        chamfer_2.Add(CHAMFER_2_SIZE - 0.0001, CHAMFER_2_SIZE_2 - 0.0001, e.wrapped, chamfer_2_side_5[0].wrapped)
    for e in chamfer_2_edges_6:
        chamfer_2.Add(CHAMFER_2_SIZE - 0.0001, CHAMFER_2_SIZE_2 - 0.0001, e.wrapped, chamfer_2_side_6[0].wrapped)
    for e in chamfer_2_edges_7:
        chamfer_2.Add(CHAMFER_2_SIZE - 0.0001, CHAMFER_2_SIZE_2 - 0.0001, e.wrapped, chamfer_2_side_7[0].wrapped)
    for e in chamfer_2_edges_8:
        chamfer_2.Add(CHAMFER_2_SIZE_2 - 0.0001, CHAMFER_2_SIZE - 0.0001, e.wrapped, chamfer_2_side_8[0].wrapped)
    for e in chamfer_2_edges_9:
        chamfer_2.Add(CHAMFER_2_SIZE - 0.0001, CHAMFER_2_SIZE_2 - 0.0001, e.wrapped, chamfer_2_side_9[0].wrapped)
    for e in chamfer_2_edges_10:
        chamfer_2.Add(CHAMFER_2_SIZE - 0.0001, CHAMFER_2_SIZE_2 - 0.0001, e.wrapped, chamfer_2_side_10[0].wrapped)
    for e in chamfer_2_edges_11:
        chamfer_2.Add(CHAMFER_2_SIZE - 0.0001, CHAMFER_2_SIZE_2 - 0.0001, e.wrapped, chamfer_2_side_11[0].wrapped)
    for e in chamfer_2_edges_12:
        chamfer_2.Add(CHAMFER_2_SIZE - 0.0001, CHAMFER_2_SIZE_2 - 0.0001, e.wrapped, chamfer_2_side_12[0].wrapped)
    for e in chamfer_2_edges_13:
        chamfer_2.Add(CHAMFER_2_SIZE - 0.0001, CHAMFER_2_SIZE_2 - 0.0001, e.wrapped, chamfer_2_side_13[0].wrapped)
    for e in chamfer_2_edges_14:
        chamfer_2.Add(CHAMFER_2_SIZE - 0.0001, CHAMFER_2_SIZE_2 - 0.0001, e.wrapped, chamfer_2_side_14[0].wrapped)
    for e in chamfer_2_edges_15:
        chamfer_2.Add(CHAMFER_2_SIZE - 0.0001, CHAMFER_2_SIZE_2 - 0.0001, e.wrapped, chamfer_2_side_15[0].wrapped)
    for e in chamfer_2_edges_16:
        chamfer_2.Add(CHAMFER_2_SIZE - 0.0001, CHAMFER_2_SIZE_2 - 0.0001, e.wrapped, chamfer_2_side_16[0].wrapped)
    for e in chamfer_2_edges_17:
        chamfer_2.Add(CHAMFER_2_SIZE - 0.0001, CHAMFER_2_SIZE_2 - 0.0001, e.wrapped, chamfer_2_side_17[0].wrapped)
    for e in chamfer_2_edges_18:
        chamfer_2.Add(CHAMFER_2_SIZE - 0.0001, CHAMFER_2_SIZE_2 - 0.0001, e.wrapped, chamfer_2_side_18[0].wrapped)
    for e in chamfer_2_edges_19:
        chamfer_2.Add(CHAMFER_2_SIZE - 0.0001, CHAMFER_2_SIZE_2 - 0.0001, e.wrapped, chamfer_2_side_19[0].wrapped)
    for e in chamfer_2_edges_20:
        chamfer_2.Add(CHAMFER_2_SIZE - 0.0001, CHAMFER_2_SIZE_2 - 0.0001, e.wrapped, chamfer_2_side_20[0].wrapped)
    for e in chamfer_2_edges_21:
        chamfer_2.Add(CHAMFER_2_SIZE - 0.0001, CHAMFER_2_SIZE_2 - 0.0001, e.wrapped, chamfer_2_side_21[0].wrapped)
    for e in chamfer_2_edges_22:
        chamfer_2.Add(CHAMFER_2_SIZE - 0.0001, CHAMFER_2_SIZE_2 - 0.0001, e.wrapped, chamfer_2_side_22[0].wrapped)
    for e in chamfer_2_edges_23:
        chamfer_2.Add(CHAMFER_2_SIZE - 0.0001, CHAMFER_2_SIZE_2 - 0.0001, e.wrapped, chamfer_2_side_23[0].wrapped)
    for e in chamfer_2_edges_24:
        chamfer_2.Add(CHAMFER_2_SIZE - 0.0001, CHAMFER_2_SIZE_2 - 0.0001, e.wrapped, chamfer_2_side_24[0].wrapped)
    add(Compound.cast(chamfer_2.Shape()), mode=Mode.REPLACE)  # a hair under: the kernel refuses the full size


solid = part.part
